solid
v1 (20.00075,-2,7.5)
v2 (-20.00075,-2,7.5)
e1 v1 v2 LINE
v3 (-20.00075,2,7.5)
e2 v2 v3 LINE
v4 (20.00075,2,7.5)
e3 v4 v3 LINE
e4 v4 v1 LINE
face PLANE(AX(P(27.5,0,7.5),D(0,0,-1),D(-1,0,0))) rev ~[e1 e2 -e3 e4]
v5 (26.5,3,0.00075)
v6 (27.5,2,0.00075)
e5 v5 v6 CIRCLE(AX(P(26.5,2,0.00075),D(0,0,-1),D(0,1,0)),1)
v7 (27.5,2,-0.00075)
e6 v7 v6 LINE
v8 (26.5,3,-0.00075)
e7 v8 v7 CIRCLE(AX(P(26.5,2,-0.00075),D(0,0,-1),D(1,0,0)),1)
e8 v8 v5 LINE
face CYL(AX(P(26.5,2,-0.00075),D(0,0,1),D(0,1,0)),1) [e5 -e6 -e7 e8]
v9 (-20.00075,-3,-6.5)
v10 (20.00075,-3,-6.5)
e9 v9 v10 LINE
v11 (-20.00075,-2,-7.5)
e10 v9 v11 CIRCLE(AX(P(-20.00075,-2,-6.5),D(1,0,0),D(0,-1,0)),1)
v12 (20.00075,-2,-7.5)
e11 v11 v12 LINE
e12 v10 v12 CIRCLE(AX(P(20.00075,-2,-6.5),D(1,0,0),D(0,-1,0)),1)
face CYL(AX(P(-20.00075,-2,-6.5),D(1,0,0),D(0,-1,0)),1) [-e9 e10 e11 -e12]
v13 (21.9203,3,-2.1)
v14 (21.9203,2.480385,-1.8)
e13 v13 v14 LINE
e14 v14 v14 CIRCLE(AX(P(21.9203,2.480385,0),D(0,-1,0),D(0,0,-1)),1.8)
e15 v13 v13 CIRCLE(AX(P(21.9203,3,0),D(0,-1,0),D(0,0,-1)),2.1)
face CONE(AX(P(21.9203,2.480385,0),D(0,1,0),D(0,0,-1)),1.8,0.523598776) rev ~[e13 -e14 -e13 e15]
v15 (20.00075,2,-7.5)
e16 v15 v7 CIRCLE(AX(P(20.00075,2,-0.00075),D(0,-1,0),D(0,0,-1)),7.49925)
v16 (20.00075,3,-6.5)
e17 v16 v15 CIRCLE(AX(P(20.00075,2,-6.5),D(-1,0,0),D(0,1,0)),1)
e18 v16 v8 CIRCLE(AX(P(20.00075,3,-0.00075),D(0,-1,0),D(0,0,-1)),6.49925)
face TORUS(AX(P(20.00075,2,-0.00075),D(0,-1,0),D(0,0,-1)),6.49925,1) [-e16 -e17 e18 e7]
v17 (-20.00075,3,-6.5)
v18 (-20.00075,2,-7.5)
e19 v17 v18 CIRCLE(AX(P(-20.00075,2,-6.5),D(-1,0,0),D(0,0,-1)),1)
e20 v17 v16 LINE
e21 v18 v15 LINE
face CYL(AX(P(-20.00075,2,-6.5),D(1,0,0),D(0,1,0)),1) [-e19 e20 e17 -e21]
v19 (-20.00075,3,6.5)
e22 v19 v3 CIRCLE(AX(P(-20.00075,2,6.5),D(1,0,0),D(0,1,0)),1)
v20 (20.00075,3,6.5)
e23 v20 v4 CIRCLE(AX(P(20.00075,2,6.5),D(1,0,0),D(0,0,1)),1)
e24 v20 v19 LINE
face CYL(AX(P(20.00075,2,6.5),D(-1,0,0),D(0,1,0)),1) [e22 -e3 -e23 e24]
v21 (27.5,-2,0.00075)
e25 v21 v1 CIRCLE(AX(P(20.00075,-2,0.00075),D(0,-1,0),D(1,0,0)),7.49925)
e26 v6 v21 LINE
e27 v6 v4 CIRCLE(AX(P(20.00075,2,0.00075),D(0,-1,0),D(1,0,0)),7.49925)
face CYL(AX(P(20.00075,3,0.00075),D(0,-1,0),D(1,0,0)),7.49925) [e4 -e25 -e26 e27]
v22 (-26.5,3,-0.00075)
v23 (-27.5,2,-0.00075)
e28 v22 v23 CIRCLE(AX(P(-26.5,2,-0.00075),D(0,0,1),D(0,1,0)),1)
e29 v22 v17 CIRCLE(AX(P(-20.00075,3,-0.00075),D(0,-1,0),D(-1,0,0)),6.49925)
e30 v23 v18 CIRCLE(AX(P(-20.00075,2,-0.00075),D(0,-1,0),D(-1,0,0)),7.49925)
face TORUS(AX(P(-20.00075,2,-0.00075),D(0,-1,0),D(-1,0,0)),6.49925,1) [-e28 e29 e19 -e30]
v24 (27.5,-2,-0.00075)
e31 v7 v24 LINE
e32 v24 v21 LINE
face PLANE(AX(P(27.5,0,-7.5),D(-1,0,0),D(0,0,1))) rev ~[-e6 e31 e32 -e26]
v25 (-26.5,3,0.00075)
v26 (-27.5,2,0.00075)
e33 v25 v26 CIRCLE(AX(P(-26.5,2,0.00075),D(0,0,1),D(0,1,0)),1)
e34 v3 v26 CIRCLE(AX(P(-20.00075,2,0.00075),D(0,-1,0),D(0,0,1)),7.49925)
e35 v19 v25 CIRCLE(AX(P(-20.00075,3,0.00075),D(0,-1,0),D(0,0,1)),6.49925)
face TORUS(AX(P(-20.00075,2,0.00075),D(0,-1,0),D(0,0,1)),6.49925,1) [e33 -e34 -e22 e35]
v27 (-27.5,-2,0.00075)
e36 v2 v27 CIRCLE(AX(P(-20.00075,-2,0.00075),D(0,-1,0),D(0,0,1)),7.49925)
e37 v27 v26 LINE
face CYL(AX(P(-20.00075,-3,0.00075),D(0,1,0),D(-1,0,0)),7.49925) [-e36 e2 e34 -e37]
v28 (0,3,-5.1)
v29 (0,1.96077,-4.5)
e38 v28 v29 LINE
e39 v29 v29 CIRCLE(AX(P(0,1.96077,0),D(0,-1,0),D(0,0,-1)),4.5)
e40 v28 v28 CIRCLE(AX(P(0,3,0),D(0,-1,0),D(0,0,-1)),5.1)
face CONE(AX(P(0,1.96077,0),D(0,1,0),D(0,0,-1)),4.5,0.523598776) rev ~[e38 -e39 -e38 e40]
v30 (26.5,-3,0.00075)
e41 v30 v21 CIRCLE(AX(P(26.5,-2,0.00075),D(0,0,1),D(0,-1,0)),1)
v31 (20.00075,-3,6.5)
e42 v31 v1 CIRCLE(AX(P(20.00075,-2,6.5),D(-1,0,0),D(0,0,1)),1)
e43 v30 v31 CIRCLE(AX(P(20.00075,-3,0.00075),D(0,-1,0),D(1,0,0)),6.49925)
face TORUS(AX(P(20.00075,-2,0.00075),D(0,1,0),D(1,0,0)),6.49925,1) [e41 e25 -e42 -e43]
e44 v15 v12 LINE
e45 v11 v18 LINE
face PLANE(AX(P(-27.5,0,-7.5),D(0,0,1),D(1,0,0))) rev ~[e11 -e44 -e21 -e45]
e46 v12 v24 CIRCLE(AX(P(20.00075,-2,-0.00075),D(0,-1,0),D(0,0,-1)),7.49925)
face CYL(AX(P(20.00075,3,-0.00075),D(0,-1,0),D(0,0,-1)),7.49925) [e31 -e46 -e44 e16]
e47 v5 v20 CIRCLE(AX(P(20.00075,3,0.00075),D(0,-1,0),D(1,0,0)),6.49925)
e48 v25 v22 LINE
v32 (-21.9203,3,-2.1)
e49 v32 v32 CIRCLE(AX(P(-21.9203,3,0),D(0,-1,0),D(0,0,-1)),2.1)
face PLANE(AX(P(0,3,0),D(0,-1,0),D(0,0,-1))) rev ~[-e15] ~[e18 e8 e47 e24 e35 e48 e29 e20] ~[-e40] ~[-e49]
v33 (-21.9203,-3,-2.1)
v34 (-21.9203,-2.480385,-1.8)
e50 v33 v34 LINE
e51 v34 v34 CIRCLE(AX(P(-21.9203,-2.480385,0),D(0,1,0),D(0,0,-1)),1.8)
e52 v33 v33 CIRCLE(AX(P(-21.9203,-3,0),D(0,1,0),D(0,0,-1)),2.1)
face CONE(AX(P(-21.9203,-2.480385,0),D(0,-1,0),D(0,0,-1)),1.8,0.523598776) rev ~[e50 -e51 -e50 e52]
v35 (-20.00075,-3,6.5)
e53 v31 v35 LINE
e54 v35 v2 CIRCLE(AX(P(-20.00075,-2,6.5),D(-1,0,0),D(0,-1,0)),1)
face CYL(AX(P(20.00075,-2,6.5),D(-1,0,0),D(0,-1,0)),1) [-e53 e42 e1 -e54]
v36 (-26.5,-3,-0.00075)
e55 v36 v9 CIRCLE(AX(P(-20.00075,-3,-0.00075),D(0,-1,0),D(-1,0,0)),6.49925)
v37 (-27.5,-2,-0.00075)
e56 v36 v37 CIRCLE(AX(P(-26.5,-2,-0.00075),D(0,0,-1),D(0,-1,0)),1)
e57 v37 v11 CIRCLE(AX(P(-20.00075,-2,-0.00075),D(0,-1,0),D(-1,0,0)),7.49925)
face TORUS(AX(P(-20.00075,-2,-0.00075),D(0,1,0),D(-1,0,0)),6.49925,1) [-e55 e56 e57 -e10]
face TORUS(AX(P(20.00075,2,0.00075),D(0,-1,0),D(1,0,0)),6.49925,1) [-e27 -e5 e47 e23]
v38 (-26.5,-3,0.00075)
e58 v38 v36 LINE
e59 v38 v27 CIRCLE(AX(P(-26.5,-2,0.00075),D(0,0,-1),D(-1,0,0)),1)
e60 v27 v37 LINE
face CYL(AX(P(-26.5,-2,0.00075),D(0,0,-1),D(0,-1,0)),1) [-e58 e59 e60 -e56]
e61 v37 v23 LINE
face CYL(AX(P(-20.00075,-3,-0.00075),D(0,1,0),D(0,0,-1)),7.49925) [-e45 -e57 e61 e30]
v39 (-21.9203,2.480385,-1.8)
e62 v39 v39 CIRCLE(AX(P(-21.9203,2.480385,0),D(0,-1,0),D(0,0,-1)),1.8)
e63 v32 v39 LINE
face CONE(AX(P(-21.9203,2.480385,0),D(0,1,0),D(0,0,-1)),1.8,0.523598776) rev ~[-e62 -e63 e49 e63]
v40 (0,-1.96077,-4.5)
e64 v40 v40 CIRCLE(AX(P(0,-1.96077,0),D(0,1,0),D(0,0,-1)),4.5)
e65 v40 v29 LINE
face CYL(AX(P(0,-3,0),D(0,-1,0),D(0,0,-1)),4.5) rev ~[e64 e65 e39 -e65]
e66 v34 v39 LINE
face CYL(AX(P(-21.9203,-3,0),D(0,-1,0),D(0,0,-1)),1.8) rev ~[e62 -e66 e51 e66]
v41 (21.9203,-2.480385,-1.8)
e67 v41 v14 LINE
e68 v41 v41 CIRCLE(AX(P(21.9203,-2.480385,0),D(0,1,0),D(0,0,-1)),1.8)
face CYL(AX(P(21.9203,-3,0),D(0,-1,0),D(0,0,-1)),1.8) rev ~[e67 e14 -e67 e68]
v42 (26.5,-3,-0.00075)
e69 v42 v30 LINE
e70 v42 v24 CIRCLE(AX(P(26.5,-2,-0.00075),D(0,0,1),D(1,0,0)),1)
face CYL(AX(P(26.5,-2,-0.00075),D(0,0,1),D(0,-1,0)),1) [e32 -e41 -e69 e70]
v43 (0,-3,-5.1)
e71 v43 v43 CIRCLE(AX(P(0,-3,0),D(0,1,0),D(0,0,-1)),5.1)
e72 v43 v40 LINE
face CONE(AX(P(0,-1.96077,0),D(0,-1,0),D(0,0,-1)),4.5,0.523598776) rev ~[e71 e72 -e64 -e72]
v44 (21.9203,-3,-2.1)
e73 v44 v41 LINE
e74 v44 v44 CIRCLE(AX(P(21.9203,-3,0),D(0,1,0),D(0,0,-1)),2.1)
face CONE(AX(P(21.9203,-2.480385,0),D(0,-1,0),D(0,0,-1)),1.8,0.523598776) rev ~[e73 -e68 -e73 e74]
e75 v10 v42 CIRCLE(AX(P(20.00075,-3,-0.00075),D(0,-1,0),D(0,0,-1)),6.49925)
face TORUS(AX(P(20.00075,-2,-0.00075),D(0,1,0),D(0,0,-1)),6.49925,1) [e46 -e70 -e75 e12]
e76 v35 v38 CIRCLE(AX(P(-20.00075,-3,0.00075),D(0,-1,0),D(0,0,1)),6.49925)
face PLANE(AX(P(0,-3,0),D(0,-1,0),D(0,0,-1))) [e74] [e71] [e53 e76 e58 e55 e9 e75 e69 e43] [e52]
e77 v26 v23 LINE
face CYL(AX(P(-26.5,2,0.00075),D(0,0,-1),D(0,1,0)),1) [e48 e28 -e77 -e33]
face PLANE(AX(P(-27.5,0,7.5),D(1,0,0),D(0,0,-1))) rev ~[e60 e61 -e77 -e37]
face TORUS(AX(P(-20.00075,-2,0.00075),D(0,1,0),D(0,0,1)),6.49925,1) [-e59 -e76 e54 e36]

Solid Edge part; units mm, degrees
sketch "Sketch1" plane through (0, 0, 0) normal (0, -1, 0) x (1, 0, 0)
  line L0 (-27.5, -7.5) -> (27.5, -7.5)
  line L1 (27.5, -7.5) -> (27.5, 7.5)
  line L2 (27.5, 7.5) -> (-27.5, 7.5)
  line L3 (-27.5, 7.5) -> (-27.5, -7.5)
  dimension "D1" = 55
  dimension "D2" = 15
extrude "ExtrudedProtrusion_1" add sketch "Sketch1" along normal blind 3 and the other way blind 3
fillet "Round_1" radius 7.5 4 edges at (27.5, 0, 7.5) (27.5, 0, -7.5) (-27.5, 0, 7.5) (-27.5, 0, -7.5)
hole "Hole_1" at (21.9203, -3, 0) direction (0, 1, 0) diameter 3.6 end up to next start chamfer 0.3 start chamfer angle 30 end chamfer 0.3 end chamfer angle 30
hole "Hole1" at (-21.9203, -3, 0) direction (0, 1, 0) diameter 3.6 end up to next start chamfer 0.3 start chamfer angle 30 end chamfer 0.3 end chamfer angle 30
fillet "Round_2" radius 1 7 edges at (0, -3, -7.5) (27.5, -3, 0) (0, -3, 7.5) (-27.5, -3, 0) (-27.5, 3, 0) (0, 3, 7.5) (0, 3, -7.5)
hole "Hole_3" at (0, -3, 0) direction (0, 1, 0) diameter 9 end up to next start chamfer 0.6 start chamfer angle 30 end chamfer 0.6 end chamfer angle 30
properties material "Polyethylene, low density"
